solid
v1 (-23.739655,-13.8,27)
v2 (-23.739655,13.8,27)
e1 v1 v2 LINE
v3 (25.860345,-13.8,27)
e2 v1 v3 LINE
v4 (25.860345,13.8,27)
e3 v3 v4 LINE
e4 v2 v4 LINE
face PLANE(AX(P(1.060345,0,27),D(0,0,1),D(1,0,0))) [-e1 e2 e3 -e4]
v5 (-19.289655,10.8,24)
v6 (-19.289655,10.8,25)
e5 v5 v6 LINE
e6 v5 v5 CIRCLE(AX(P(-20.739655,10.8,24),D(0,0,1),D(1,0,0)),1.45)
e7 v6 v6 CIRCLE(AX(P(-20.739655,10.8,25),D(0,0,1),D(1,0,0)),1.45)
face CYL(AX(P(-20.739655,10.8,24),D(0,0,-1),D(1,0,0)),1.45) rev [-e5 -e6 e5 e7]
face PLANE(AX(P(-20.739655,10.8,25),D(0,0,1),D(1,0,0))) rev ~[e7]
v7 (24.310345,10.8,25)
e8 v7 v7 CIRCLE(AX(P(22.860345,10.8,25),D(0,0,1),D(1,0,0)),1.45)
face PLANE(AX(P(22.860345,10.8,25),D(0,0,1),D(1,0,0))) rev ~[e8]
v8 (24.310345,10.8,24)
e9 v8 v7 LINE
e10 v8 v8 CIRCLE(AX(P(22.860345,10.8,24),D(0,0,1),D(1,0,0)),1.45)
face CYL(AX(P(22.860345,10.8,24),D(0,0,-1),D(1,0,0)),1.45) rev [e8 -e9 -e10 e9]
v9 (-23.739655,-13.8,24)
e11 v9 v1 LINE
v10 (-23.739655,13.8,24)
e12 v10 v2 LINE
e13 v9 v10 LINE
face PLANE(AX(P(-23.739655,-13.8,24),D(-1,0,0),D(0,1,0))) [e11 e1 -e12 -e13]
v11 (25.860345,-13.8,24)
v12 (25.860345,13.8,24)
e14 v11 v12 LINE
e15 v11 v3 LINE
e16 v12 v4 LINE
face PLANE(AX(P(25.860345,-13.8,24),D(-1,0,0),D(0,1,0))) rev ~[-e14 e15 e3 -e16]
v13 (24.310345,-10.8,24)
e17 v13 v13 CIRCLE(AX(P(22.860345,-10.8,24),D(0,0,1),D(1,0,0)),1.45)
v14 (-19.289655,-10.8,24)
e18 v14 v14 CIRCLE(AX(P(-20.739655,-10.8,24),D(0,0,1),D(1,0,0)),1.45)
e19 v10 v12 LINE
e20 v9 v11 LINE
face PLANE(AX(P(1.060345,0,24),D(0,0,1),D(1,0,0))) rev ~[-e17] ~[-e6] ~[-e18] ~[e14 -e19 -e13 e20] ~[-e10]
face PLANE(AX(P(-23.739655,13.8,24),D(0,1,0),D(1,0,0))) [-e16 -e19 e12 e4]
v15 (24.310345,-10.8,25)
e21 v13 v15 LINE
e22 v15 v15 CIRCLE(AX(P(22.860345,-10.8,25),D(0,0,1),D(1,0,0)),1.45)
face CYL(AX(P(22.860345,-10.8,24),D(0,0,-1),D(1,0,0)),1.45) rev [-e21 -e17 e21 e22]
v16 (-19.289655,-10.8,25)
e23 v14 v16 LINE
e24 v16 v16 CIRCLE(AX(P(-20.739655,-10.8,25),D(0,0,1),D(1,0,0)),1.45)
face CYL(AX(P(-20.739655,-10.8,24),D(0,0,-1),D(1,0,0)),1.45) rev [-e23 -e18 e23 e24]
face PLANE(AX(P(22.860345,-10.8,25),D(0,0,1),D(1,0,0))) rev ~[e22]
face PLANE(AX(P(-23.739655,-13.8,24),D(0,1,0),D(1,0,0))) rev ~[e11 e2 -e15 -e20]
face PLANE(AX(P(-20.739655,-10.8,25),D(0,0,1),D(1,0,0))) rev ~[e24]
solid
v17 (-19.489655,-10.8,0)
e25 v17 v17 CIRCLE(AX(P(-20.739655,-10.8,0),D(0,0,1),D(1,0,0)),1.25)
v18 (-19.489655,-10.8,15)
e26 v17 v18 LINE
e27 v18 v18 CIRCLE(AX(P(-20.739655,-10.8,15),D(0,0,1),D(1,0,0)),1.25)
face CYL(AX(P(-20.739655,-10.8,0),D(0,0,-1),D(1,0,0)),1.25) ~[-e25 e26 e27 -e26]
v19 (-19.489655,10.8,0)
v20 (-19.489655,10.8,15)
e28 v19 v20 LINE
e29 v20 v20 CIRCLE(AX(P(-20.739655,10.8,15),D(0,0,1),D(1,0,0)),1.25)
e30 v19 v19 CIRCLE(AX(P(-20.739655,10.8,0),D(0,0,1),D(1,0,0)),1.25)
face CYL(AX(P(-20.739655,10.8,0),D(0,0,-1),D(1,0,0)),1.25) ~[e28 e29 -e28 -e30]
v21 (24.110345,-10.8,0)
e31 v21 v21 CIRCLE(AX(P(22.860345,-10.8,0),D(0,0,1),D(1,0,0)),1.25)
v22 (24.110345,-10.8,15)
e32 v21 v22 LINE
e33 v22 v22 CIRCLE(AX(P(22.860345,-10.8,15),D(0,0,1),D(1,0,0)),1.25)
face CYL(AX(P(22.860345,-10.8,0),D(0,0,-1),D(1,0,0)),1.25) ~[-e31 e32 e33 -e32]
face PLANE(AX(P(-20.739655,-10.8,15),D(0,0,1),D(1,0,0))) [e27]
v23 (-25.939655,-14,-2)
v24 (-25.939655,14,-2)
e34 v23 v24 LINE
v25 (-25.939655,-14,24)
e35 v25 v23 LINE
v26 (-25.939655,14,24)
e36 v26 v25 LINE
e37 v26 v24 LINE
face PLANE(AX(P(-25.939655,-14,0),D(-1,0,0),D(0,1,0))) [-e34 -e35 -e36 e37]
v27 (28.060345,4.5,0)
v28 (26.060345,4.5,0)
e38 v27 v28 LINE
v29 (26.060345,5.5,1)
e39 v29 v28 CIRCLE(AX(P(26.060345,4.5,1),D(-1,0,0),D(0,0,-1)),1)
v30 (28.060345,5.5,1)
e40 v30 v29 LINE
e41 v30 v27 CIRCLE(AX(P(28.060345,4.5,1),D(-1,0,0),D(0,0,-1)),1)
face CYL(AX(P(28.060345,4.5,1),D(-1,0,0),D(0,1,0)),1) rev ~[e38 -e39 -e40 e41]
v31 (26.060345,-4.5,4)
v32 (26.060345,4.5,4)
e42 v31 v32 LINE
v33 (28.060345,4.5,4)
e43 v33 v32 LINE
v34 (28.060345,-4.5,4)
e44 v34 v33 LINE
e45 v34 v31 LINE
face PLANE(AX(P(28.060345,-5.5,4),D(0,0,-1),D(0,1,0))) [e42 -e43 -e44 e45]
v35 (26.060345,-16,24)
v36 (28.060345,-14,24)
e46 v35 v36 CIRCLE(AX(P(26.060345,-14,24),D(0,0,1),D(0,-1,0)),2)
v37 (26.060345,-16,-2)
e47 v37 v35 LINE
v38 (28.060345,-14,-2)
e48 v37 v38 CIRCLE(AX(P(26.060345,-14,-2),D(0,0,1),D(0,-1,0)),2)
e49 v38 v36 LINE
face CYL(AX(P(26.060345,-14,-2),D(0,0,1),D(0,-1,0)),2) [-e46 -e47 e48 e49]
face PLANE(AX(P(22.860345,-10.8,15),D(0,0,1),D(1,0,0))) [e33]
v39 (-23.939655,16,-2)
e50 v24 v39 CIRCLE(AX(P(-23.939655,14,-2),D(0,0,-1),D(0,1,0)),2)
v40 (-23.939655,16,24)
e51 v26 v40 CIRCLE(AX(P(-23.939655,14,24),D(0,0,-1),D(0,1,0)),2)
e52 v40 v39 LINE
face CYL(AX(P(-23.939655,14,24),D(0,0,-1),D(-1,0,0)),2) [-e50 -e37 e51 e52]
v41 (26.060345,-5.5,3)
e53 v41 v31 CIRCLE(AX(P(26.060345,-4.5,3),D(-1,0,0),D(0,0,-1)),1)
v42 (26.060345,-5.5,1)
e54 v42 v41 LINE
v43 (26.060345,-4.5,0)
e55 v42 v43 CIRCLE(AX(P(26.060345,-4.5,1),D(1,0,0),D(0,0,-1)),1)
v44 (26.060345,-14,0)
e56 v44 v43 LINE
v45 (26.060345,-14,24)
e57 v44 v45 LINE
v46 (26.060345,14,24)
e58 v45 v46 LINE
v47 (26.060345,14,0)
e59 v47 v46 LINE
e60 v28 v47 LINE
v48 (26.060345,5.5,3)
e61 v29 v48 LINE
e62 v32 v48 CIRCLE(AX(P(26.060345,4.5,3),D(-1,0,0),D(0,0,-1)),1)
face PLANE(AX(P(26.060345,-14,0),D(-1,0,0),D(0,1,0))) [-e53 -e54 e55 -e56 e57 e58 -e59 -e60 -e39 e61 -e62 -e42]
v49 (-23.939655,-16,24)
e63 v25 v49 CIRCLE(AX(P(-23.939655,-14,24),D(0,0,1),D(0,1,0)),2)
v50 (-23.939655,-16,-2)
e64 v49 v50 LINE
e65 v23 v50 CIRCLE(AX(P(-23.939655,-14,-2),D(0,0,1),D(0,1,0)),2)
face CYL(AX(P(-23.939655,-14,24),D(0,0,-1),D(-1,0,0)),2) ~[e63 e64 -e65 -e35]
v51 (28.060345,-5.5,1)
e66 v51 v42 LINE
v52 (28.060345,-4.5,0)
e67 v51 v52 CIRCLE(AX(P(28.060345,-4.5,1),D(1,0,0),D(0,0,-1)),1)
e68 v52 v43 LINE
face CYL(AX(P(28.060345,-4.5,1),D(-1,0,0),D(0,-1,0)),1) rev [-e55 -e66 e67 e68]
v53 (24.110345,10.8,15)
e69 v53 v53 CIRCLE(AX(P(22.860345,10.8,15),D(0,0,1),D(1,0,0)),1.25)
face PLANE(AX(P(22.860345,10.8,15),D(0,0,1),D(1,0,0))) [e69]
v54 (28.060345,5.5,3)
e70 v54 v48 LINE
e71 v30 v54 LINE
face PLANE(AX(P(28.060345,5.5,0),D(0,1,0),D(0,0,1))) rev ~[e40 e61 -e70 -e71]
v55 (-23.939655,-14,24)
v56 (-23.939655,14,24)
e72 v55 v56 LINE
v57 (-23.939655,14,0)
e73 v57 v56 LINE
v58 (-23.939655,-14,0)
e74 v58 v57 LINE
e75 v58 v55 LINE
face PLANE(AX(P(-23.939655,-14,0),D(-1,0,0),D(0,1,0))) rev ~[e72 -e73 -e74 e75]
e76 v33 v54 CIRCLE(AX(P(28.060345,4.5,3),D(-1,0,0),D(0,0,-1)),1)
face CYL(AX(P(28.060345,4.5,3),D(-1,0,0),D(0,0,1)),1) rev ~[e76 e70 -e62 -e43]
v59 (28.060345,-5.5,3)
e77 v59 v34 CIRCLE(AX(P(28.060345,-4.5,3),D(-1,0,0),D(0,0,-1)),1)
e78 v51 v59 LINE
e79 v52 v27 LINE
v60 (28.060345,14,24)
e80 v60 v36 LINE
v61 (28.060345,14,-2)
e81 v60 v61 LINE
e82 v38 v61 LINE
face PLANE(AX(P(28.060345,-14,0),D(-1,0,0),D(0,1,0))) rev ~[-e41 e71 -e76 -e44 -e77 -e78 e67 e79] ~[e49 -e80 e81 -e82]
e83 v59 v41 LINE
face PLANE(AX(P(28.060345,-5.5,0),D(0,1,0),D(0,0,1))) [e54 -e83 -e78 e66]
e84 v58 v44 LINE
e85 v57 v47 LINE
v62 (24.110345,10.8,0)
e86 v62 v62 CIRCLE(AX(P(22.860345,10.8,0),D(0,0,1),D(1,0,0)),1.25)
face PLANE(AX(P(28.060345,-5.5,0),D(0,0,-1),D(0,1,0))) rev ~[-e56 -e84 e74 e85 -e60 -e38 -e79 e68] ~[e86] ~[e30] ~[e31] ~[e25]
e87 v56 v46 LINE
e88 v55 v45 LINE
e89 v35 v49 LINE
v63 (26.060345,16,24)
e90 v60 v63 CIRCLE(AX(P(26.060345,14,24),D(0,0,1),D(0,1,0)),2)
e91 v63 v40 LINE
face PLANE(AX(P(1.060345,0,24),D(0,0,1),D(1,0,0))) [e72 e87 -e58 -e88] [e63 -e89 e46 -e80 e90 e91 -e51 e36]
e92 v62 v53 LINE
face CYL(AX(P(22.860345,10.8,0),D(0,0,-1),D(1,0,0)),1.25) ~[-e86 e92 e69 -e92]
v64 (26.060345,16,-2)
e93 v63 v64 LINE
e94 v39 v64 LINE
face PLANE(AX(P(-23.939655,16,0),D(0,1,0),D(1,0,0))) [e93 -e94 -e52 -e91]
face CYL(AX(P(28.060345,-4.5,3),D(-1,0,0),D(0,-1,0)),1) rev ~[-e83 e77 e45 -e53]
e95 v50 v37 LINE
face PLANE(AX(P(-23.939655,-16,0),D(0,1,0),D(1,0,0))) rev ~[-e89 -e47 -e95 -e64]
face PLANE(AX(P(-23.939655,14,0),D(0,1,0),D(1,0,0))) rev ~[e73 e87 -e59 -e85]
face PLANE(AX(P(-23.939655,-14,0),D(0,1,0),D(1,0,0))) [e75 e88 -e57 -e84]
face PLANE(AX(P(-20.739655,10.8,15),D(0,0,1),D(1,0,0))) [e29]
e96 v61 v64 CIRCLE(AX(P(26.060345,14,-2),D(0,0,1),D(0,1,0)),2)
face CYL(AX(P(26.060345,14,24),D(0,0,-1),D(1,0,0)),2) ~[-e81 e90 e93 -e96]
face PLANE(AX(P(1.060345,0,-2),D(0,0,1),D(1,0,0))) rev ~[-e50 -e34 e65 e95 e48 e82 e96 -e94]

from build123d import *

# Parameters (mm, degrees)
F1_W      = 50
F1_H      = 28
F1_R      = 1.25
F2_DEPTH  = 24
F3_T      = 2
F4_DEPTH  = 15
F5_R      = 2
F6_W      = 11
F6_H      = 4
F7_DEPTH  = 2
F8_R      = 1
F9_W      = 49.6
F9_H      = 27.6
F9_R      = 1.45
F10_DEPTH = 3
F11_DEPTH = 1


with BuildPart() as f2:
    # F1 (on Top) → F2 (new body)
    with BuildSketch(Plane.XY):
        with Locations((1.0603448276, 0)):
            Rectangle(F1_W, F1_H)
        with Locations((-20.7396551724, -10.8)):
            Circle(F1_R, mode=Mode.SUBTRACT)
        with Locations((22.8603448276, -10.8)):
            Circle(F1_R, mode=Mode.SUBTRACT)
        with Locations((-20.7396551724, 10.8)):
            Circle(F1_R, mode=Mode.SUBTRACT)
        with Locations((22.8603448276, 10.8)):
            Circle(F1_R, mode=Mode.SUBTRACT)
        with Locations((22.8603448276, -10.8)):
            Circle(F1_R)
        with Locations((-20.7396551724, -10.8)):
            Circle(F1_R)
        with Locations((-20.7396551724, 10.8)):
            Circle(F1_R)
        with Locations((22.8603448276, 10.8)):
            Circle(F1_R)
    extrude(amount=F2_DEPTH)

    # F3
    f3_openings = [f2.faces().sort_by_distance(p)[0] for p in [
        (1.060345, 0, 24),
    ]]
    offset(amount=F3_T, openings=f3_openings, kind=Kind.INTERSECTION)

    # F1 (on Top) → F4 (join)
    with BuildSketch(Plane.XY):
        with Locations((-20.7396551724, -10.8)):
            Circle(F1_R)
        with Locations((-20.7396551724, 10.8)):
            Circle(F1_R)
        with Locations((22.8603448276, -10.8)):
            Circle(F1_R)
        with Locations((22.8603448276, 10.8)):
            Circle(F1_R)
    extrude(amount=F4_DEPTH)

    # F5
    f5_edges = [f2.edges().sort_by_distance(p)[0] for p in [
        (28.060345, -16, 11),
        (-25.939655, -16, 11),
        (28.060345, 16, 11),
        (-25.939655, 16, 11),
    ]]
    fillet(f5_edges, radius=F5_R)

    # F6 (on face) → F7 (cut)
    with BuildSketch(Plane.YZ.offset(28.0603448276)):
        with Locations((0, 2)):
            Rectangle(F6_W, F6_H)
    extrude(amount=-F7_DEPTH, mode=Mode.SUBTRACT)

    # F8
    f8_edges = [f2.edges().sort_by_distance(p)[0] for p in [
        (27.060345, 5.5, 4),
        (27.060345, -5.5, 4),
        (27.060345, 5.5, 0),
        (27.060345, -5.5, 0),
    ]]
    fillet(f8_edges, radius=F8_R)


with BuildPart() as f10:
    # F9 (on face) → F10 (new body)
    with BuildSketch(Plane.XY.offset(24)):
        with Locations((1.0603448276, 0)):
            Rectangle(F9_W, F9_H)
        with Locations((-20.7396551724, -10.8)):
            Circle(F9_R, mode=Mode.SUBTRACT)
        with Locations((22.8603448276, -10.8)):
            Circle(F9_R, mode=Mode.SUBTRACT)
        with Locations((-20.7396551724, 10.8)):
            Circle(F9_R, mode=Mode.SUBTRACT)
        with Locations((22.8603448276, 10.8)):
            Circle(F9_R, mode=Mode.SUBTRACT)
        with Locations((-20.7396551724, -10.8)):
            Circle(F9_R)
        with Locations((22.8603448276, -10.8)):
            Circle(F9_R)
        with Locations((22.8603448276, 10.8)):
            Circle(F9_R)
        with Locations((-20.7396551724, 10.8)):
            Circle(F9_R)
    extrude(amount=F10_DEPTH)

    # F9 (on face) → F11 (cut)
    with BuildSketch(Plane.XY.offset(24)):
        with Locations((-20.7396551724, -10.8)):
            Circle(F9_R)
        with Locations((-20.7396551724, 10.8)):
            Circle(F9_R)
        with Locations((22.8603448276, 10.8)):
            Circle(F9_R)
        with Locations((22.8603448276, -10.8)):
            Circle(F9_R)
    extrude(amount=F11_DEPTH, mode=Mode.SUBTRACT)


solid = Compound([f2.part, f10.part])
